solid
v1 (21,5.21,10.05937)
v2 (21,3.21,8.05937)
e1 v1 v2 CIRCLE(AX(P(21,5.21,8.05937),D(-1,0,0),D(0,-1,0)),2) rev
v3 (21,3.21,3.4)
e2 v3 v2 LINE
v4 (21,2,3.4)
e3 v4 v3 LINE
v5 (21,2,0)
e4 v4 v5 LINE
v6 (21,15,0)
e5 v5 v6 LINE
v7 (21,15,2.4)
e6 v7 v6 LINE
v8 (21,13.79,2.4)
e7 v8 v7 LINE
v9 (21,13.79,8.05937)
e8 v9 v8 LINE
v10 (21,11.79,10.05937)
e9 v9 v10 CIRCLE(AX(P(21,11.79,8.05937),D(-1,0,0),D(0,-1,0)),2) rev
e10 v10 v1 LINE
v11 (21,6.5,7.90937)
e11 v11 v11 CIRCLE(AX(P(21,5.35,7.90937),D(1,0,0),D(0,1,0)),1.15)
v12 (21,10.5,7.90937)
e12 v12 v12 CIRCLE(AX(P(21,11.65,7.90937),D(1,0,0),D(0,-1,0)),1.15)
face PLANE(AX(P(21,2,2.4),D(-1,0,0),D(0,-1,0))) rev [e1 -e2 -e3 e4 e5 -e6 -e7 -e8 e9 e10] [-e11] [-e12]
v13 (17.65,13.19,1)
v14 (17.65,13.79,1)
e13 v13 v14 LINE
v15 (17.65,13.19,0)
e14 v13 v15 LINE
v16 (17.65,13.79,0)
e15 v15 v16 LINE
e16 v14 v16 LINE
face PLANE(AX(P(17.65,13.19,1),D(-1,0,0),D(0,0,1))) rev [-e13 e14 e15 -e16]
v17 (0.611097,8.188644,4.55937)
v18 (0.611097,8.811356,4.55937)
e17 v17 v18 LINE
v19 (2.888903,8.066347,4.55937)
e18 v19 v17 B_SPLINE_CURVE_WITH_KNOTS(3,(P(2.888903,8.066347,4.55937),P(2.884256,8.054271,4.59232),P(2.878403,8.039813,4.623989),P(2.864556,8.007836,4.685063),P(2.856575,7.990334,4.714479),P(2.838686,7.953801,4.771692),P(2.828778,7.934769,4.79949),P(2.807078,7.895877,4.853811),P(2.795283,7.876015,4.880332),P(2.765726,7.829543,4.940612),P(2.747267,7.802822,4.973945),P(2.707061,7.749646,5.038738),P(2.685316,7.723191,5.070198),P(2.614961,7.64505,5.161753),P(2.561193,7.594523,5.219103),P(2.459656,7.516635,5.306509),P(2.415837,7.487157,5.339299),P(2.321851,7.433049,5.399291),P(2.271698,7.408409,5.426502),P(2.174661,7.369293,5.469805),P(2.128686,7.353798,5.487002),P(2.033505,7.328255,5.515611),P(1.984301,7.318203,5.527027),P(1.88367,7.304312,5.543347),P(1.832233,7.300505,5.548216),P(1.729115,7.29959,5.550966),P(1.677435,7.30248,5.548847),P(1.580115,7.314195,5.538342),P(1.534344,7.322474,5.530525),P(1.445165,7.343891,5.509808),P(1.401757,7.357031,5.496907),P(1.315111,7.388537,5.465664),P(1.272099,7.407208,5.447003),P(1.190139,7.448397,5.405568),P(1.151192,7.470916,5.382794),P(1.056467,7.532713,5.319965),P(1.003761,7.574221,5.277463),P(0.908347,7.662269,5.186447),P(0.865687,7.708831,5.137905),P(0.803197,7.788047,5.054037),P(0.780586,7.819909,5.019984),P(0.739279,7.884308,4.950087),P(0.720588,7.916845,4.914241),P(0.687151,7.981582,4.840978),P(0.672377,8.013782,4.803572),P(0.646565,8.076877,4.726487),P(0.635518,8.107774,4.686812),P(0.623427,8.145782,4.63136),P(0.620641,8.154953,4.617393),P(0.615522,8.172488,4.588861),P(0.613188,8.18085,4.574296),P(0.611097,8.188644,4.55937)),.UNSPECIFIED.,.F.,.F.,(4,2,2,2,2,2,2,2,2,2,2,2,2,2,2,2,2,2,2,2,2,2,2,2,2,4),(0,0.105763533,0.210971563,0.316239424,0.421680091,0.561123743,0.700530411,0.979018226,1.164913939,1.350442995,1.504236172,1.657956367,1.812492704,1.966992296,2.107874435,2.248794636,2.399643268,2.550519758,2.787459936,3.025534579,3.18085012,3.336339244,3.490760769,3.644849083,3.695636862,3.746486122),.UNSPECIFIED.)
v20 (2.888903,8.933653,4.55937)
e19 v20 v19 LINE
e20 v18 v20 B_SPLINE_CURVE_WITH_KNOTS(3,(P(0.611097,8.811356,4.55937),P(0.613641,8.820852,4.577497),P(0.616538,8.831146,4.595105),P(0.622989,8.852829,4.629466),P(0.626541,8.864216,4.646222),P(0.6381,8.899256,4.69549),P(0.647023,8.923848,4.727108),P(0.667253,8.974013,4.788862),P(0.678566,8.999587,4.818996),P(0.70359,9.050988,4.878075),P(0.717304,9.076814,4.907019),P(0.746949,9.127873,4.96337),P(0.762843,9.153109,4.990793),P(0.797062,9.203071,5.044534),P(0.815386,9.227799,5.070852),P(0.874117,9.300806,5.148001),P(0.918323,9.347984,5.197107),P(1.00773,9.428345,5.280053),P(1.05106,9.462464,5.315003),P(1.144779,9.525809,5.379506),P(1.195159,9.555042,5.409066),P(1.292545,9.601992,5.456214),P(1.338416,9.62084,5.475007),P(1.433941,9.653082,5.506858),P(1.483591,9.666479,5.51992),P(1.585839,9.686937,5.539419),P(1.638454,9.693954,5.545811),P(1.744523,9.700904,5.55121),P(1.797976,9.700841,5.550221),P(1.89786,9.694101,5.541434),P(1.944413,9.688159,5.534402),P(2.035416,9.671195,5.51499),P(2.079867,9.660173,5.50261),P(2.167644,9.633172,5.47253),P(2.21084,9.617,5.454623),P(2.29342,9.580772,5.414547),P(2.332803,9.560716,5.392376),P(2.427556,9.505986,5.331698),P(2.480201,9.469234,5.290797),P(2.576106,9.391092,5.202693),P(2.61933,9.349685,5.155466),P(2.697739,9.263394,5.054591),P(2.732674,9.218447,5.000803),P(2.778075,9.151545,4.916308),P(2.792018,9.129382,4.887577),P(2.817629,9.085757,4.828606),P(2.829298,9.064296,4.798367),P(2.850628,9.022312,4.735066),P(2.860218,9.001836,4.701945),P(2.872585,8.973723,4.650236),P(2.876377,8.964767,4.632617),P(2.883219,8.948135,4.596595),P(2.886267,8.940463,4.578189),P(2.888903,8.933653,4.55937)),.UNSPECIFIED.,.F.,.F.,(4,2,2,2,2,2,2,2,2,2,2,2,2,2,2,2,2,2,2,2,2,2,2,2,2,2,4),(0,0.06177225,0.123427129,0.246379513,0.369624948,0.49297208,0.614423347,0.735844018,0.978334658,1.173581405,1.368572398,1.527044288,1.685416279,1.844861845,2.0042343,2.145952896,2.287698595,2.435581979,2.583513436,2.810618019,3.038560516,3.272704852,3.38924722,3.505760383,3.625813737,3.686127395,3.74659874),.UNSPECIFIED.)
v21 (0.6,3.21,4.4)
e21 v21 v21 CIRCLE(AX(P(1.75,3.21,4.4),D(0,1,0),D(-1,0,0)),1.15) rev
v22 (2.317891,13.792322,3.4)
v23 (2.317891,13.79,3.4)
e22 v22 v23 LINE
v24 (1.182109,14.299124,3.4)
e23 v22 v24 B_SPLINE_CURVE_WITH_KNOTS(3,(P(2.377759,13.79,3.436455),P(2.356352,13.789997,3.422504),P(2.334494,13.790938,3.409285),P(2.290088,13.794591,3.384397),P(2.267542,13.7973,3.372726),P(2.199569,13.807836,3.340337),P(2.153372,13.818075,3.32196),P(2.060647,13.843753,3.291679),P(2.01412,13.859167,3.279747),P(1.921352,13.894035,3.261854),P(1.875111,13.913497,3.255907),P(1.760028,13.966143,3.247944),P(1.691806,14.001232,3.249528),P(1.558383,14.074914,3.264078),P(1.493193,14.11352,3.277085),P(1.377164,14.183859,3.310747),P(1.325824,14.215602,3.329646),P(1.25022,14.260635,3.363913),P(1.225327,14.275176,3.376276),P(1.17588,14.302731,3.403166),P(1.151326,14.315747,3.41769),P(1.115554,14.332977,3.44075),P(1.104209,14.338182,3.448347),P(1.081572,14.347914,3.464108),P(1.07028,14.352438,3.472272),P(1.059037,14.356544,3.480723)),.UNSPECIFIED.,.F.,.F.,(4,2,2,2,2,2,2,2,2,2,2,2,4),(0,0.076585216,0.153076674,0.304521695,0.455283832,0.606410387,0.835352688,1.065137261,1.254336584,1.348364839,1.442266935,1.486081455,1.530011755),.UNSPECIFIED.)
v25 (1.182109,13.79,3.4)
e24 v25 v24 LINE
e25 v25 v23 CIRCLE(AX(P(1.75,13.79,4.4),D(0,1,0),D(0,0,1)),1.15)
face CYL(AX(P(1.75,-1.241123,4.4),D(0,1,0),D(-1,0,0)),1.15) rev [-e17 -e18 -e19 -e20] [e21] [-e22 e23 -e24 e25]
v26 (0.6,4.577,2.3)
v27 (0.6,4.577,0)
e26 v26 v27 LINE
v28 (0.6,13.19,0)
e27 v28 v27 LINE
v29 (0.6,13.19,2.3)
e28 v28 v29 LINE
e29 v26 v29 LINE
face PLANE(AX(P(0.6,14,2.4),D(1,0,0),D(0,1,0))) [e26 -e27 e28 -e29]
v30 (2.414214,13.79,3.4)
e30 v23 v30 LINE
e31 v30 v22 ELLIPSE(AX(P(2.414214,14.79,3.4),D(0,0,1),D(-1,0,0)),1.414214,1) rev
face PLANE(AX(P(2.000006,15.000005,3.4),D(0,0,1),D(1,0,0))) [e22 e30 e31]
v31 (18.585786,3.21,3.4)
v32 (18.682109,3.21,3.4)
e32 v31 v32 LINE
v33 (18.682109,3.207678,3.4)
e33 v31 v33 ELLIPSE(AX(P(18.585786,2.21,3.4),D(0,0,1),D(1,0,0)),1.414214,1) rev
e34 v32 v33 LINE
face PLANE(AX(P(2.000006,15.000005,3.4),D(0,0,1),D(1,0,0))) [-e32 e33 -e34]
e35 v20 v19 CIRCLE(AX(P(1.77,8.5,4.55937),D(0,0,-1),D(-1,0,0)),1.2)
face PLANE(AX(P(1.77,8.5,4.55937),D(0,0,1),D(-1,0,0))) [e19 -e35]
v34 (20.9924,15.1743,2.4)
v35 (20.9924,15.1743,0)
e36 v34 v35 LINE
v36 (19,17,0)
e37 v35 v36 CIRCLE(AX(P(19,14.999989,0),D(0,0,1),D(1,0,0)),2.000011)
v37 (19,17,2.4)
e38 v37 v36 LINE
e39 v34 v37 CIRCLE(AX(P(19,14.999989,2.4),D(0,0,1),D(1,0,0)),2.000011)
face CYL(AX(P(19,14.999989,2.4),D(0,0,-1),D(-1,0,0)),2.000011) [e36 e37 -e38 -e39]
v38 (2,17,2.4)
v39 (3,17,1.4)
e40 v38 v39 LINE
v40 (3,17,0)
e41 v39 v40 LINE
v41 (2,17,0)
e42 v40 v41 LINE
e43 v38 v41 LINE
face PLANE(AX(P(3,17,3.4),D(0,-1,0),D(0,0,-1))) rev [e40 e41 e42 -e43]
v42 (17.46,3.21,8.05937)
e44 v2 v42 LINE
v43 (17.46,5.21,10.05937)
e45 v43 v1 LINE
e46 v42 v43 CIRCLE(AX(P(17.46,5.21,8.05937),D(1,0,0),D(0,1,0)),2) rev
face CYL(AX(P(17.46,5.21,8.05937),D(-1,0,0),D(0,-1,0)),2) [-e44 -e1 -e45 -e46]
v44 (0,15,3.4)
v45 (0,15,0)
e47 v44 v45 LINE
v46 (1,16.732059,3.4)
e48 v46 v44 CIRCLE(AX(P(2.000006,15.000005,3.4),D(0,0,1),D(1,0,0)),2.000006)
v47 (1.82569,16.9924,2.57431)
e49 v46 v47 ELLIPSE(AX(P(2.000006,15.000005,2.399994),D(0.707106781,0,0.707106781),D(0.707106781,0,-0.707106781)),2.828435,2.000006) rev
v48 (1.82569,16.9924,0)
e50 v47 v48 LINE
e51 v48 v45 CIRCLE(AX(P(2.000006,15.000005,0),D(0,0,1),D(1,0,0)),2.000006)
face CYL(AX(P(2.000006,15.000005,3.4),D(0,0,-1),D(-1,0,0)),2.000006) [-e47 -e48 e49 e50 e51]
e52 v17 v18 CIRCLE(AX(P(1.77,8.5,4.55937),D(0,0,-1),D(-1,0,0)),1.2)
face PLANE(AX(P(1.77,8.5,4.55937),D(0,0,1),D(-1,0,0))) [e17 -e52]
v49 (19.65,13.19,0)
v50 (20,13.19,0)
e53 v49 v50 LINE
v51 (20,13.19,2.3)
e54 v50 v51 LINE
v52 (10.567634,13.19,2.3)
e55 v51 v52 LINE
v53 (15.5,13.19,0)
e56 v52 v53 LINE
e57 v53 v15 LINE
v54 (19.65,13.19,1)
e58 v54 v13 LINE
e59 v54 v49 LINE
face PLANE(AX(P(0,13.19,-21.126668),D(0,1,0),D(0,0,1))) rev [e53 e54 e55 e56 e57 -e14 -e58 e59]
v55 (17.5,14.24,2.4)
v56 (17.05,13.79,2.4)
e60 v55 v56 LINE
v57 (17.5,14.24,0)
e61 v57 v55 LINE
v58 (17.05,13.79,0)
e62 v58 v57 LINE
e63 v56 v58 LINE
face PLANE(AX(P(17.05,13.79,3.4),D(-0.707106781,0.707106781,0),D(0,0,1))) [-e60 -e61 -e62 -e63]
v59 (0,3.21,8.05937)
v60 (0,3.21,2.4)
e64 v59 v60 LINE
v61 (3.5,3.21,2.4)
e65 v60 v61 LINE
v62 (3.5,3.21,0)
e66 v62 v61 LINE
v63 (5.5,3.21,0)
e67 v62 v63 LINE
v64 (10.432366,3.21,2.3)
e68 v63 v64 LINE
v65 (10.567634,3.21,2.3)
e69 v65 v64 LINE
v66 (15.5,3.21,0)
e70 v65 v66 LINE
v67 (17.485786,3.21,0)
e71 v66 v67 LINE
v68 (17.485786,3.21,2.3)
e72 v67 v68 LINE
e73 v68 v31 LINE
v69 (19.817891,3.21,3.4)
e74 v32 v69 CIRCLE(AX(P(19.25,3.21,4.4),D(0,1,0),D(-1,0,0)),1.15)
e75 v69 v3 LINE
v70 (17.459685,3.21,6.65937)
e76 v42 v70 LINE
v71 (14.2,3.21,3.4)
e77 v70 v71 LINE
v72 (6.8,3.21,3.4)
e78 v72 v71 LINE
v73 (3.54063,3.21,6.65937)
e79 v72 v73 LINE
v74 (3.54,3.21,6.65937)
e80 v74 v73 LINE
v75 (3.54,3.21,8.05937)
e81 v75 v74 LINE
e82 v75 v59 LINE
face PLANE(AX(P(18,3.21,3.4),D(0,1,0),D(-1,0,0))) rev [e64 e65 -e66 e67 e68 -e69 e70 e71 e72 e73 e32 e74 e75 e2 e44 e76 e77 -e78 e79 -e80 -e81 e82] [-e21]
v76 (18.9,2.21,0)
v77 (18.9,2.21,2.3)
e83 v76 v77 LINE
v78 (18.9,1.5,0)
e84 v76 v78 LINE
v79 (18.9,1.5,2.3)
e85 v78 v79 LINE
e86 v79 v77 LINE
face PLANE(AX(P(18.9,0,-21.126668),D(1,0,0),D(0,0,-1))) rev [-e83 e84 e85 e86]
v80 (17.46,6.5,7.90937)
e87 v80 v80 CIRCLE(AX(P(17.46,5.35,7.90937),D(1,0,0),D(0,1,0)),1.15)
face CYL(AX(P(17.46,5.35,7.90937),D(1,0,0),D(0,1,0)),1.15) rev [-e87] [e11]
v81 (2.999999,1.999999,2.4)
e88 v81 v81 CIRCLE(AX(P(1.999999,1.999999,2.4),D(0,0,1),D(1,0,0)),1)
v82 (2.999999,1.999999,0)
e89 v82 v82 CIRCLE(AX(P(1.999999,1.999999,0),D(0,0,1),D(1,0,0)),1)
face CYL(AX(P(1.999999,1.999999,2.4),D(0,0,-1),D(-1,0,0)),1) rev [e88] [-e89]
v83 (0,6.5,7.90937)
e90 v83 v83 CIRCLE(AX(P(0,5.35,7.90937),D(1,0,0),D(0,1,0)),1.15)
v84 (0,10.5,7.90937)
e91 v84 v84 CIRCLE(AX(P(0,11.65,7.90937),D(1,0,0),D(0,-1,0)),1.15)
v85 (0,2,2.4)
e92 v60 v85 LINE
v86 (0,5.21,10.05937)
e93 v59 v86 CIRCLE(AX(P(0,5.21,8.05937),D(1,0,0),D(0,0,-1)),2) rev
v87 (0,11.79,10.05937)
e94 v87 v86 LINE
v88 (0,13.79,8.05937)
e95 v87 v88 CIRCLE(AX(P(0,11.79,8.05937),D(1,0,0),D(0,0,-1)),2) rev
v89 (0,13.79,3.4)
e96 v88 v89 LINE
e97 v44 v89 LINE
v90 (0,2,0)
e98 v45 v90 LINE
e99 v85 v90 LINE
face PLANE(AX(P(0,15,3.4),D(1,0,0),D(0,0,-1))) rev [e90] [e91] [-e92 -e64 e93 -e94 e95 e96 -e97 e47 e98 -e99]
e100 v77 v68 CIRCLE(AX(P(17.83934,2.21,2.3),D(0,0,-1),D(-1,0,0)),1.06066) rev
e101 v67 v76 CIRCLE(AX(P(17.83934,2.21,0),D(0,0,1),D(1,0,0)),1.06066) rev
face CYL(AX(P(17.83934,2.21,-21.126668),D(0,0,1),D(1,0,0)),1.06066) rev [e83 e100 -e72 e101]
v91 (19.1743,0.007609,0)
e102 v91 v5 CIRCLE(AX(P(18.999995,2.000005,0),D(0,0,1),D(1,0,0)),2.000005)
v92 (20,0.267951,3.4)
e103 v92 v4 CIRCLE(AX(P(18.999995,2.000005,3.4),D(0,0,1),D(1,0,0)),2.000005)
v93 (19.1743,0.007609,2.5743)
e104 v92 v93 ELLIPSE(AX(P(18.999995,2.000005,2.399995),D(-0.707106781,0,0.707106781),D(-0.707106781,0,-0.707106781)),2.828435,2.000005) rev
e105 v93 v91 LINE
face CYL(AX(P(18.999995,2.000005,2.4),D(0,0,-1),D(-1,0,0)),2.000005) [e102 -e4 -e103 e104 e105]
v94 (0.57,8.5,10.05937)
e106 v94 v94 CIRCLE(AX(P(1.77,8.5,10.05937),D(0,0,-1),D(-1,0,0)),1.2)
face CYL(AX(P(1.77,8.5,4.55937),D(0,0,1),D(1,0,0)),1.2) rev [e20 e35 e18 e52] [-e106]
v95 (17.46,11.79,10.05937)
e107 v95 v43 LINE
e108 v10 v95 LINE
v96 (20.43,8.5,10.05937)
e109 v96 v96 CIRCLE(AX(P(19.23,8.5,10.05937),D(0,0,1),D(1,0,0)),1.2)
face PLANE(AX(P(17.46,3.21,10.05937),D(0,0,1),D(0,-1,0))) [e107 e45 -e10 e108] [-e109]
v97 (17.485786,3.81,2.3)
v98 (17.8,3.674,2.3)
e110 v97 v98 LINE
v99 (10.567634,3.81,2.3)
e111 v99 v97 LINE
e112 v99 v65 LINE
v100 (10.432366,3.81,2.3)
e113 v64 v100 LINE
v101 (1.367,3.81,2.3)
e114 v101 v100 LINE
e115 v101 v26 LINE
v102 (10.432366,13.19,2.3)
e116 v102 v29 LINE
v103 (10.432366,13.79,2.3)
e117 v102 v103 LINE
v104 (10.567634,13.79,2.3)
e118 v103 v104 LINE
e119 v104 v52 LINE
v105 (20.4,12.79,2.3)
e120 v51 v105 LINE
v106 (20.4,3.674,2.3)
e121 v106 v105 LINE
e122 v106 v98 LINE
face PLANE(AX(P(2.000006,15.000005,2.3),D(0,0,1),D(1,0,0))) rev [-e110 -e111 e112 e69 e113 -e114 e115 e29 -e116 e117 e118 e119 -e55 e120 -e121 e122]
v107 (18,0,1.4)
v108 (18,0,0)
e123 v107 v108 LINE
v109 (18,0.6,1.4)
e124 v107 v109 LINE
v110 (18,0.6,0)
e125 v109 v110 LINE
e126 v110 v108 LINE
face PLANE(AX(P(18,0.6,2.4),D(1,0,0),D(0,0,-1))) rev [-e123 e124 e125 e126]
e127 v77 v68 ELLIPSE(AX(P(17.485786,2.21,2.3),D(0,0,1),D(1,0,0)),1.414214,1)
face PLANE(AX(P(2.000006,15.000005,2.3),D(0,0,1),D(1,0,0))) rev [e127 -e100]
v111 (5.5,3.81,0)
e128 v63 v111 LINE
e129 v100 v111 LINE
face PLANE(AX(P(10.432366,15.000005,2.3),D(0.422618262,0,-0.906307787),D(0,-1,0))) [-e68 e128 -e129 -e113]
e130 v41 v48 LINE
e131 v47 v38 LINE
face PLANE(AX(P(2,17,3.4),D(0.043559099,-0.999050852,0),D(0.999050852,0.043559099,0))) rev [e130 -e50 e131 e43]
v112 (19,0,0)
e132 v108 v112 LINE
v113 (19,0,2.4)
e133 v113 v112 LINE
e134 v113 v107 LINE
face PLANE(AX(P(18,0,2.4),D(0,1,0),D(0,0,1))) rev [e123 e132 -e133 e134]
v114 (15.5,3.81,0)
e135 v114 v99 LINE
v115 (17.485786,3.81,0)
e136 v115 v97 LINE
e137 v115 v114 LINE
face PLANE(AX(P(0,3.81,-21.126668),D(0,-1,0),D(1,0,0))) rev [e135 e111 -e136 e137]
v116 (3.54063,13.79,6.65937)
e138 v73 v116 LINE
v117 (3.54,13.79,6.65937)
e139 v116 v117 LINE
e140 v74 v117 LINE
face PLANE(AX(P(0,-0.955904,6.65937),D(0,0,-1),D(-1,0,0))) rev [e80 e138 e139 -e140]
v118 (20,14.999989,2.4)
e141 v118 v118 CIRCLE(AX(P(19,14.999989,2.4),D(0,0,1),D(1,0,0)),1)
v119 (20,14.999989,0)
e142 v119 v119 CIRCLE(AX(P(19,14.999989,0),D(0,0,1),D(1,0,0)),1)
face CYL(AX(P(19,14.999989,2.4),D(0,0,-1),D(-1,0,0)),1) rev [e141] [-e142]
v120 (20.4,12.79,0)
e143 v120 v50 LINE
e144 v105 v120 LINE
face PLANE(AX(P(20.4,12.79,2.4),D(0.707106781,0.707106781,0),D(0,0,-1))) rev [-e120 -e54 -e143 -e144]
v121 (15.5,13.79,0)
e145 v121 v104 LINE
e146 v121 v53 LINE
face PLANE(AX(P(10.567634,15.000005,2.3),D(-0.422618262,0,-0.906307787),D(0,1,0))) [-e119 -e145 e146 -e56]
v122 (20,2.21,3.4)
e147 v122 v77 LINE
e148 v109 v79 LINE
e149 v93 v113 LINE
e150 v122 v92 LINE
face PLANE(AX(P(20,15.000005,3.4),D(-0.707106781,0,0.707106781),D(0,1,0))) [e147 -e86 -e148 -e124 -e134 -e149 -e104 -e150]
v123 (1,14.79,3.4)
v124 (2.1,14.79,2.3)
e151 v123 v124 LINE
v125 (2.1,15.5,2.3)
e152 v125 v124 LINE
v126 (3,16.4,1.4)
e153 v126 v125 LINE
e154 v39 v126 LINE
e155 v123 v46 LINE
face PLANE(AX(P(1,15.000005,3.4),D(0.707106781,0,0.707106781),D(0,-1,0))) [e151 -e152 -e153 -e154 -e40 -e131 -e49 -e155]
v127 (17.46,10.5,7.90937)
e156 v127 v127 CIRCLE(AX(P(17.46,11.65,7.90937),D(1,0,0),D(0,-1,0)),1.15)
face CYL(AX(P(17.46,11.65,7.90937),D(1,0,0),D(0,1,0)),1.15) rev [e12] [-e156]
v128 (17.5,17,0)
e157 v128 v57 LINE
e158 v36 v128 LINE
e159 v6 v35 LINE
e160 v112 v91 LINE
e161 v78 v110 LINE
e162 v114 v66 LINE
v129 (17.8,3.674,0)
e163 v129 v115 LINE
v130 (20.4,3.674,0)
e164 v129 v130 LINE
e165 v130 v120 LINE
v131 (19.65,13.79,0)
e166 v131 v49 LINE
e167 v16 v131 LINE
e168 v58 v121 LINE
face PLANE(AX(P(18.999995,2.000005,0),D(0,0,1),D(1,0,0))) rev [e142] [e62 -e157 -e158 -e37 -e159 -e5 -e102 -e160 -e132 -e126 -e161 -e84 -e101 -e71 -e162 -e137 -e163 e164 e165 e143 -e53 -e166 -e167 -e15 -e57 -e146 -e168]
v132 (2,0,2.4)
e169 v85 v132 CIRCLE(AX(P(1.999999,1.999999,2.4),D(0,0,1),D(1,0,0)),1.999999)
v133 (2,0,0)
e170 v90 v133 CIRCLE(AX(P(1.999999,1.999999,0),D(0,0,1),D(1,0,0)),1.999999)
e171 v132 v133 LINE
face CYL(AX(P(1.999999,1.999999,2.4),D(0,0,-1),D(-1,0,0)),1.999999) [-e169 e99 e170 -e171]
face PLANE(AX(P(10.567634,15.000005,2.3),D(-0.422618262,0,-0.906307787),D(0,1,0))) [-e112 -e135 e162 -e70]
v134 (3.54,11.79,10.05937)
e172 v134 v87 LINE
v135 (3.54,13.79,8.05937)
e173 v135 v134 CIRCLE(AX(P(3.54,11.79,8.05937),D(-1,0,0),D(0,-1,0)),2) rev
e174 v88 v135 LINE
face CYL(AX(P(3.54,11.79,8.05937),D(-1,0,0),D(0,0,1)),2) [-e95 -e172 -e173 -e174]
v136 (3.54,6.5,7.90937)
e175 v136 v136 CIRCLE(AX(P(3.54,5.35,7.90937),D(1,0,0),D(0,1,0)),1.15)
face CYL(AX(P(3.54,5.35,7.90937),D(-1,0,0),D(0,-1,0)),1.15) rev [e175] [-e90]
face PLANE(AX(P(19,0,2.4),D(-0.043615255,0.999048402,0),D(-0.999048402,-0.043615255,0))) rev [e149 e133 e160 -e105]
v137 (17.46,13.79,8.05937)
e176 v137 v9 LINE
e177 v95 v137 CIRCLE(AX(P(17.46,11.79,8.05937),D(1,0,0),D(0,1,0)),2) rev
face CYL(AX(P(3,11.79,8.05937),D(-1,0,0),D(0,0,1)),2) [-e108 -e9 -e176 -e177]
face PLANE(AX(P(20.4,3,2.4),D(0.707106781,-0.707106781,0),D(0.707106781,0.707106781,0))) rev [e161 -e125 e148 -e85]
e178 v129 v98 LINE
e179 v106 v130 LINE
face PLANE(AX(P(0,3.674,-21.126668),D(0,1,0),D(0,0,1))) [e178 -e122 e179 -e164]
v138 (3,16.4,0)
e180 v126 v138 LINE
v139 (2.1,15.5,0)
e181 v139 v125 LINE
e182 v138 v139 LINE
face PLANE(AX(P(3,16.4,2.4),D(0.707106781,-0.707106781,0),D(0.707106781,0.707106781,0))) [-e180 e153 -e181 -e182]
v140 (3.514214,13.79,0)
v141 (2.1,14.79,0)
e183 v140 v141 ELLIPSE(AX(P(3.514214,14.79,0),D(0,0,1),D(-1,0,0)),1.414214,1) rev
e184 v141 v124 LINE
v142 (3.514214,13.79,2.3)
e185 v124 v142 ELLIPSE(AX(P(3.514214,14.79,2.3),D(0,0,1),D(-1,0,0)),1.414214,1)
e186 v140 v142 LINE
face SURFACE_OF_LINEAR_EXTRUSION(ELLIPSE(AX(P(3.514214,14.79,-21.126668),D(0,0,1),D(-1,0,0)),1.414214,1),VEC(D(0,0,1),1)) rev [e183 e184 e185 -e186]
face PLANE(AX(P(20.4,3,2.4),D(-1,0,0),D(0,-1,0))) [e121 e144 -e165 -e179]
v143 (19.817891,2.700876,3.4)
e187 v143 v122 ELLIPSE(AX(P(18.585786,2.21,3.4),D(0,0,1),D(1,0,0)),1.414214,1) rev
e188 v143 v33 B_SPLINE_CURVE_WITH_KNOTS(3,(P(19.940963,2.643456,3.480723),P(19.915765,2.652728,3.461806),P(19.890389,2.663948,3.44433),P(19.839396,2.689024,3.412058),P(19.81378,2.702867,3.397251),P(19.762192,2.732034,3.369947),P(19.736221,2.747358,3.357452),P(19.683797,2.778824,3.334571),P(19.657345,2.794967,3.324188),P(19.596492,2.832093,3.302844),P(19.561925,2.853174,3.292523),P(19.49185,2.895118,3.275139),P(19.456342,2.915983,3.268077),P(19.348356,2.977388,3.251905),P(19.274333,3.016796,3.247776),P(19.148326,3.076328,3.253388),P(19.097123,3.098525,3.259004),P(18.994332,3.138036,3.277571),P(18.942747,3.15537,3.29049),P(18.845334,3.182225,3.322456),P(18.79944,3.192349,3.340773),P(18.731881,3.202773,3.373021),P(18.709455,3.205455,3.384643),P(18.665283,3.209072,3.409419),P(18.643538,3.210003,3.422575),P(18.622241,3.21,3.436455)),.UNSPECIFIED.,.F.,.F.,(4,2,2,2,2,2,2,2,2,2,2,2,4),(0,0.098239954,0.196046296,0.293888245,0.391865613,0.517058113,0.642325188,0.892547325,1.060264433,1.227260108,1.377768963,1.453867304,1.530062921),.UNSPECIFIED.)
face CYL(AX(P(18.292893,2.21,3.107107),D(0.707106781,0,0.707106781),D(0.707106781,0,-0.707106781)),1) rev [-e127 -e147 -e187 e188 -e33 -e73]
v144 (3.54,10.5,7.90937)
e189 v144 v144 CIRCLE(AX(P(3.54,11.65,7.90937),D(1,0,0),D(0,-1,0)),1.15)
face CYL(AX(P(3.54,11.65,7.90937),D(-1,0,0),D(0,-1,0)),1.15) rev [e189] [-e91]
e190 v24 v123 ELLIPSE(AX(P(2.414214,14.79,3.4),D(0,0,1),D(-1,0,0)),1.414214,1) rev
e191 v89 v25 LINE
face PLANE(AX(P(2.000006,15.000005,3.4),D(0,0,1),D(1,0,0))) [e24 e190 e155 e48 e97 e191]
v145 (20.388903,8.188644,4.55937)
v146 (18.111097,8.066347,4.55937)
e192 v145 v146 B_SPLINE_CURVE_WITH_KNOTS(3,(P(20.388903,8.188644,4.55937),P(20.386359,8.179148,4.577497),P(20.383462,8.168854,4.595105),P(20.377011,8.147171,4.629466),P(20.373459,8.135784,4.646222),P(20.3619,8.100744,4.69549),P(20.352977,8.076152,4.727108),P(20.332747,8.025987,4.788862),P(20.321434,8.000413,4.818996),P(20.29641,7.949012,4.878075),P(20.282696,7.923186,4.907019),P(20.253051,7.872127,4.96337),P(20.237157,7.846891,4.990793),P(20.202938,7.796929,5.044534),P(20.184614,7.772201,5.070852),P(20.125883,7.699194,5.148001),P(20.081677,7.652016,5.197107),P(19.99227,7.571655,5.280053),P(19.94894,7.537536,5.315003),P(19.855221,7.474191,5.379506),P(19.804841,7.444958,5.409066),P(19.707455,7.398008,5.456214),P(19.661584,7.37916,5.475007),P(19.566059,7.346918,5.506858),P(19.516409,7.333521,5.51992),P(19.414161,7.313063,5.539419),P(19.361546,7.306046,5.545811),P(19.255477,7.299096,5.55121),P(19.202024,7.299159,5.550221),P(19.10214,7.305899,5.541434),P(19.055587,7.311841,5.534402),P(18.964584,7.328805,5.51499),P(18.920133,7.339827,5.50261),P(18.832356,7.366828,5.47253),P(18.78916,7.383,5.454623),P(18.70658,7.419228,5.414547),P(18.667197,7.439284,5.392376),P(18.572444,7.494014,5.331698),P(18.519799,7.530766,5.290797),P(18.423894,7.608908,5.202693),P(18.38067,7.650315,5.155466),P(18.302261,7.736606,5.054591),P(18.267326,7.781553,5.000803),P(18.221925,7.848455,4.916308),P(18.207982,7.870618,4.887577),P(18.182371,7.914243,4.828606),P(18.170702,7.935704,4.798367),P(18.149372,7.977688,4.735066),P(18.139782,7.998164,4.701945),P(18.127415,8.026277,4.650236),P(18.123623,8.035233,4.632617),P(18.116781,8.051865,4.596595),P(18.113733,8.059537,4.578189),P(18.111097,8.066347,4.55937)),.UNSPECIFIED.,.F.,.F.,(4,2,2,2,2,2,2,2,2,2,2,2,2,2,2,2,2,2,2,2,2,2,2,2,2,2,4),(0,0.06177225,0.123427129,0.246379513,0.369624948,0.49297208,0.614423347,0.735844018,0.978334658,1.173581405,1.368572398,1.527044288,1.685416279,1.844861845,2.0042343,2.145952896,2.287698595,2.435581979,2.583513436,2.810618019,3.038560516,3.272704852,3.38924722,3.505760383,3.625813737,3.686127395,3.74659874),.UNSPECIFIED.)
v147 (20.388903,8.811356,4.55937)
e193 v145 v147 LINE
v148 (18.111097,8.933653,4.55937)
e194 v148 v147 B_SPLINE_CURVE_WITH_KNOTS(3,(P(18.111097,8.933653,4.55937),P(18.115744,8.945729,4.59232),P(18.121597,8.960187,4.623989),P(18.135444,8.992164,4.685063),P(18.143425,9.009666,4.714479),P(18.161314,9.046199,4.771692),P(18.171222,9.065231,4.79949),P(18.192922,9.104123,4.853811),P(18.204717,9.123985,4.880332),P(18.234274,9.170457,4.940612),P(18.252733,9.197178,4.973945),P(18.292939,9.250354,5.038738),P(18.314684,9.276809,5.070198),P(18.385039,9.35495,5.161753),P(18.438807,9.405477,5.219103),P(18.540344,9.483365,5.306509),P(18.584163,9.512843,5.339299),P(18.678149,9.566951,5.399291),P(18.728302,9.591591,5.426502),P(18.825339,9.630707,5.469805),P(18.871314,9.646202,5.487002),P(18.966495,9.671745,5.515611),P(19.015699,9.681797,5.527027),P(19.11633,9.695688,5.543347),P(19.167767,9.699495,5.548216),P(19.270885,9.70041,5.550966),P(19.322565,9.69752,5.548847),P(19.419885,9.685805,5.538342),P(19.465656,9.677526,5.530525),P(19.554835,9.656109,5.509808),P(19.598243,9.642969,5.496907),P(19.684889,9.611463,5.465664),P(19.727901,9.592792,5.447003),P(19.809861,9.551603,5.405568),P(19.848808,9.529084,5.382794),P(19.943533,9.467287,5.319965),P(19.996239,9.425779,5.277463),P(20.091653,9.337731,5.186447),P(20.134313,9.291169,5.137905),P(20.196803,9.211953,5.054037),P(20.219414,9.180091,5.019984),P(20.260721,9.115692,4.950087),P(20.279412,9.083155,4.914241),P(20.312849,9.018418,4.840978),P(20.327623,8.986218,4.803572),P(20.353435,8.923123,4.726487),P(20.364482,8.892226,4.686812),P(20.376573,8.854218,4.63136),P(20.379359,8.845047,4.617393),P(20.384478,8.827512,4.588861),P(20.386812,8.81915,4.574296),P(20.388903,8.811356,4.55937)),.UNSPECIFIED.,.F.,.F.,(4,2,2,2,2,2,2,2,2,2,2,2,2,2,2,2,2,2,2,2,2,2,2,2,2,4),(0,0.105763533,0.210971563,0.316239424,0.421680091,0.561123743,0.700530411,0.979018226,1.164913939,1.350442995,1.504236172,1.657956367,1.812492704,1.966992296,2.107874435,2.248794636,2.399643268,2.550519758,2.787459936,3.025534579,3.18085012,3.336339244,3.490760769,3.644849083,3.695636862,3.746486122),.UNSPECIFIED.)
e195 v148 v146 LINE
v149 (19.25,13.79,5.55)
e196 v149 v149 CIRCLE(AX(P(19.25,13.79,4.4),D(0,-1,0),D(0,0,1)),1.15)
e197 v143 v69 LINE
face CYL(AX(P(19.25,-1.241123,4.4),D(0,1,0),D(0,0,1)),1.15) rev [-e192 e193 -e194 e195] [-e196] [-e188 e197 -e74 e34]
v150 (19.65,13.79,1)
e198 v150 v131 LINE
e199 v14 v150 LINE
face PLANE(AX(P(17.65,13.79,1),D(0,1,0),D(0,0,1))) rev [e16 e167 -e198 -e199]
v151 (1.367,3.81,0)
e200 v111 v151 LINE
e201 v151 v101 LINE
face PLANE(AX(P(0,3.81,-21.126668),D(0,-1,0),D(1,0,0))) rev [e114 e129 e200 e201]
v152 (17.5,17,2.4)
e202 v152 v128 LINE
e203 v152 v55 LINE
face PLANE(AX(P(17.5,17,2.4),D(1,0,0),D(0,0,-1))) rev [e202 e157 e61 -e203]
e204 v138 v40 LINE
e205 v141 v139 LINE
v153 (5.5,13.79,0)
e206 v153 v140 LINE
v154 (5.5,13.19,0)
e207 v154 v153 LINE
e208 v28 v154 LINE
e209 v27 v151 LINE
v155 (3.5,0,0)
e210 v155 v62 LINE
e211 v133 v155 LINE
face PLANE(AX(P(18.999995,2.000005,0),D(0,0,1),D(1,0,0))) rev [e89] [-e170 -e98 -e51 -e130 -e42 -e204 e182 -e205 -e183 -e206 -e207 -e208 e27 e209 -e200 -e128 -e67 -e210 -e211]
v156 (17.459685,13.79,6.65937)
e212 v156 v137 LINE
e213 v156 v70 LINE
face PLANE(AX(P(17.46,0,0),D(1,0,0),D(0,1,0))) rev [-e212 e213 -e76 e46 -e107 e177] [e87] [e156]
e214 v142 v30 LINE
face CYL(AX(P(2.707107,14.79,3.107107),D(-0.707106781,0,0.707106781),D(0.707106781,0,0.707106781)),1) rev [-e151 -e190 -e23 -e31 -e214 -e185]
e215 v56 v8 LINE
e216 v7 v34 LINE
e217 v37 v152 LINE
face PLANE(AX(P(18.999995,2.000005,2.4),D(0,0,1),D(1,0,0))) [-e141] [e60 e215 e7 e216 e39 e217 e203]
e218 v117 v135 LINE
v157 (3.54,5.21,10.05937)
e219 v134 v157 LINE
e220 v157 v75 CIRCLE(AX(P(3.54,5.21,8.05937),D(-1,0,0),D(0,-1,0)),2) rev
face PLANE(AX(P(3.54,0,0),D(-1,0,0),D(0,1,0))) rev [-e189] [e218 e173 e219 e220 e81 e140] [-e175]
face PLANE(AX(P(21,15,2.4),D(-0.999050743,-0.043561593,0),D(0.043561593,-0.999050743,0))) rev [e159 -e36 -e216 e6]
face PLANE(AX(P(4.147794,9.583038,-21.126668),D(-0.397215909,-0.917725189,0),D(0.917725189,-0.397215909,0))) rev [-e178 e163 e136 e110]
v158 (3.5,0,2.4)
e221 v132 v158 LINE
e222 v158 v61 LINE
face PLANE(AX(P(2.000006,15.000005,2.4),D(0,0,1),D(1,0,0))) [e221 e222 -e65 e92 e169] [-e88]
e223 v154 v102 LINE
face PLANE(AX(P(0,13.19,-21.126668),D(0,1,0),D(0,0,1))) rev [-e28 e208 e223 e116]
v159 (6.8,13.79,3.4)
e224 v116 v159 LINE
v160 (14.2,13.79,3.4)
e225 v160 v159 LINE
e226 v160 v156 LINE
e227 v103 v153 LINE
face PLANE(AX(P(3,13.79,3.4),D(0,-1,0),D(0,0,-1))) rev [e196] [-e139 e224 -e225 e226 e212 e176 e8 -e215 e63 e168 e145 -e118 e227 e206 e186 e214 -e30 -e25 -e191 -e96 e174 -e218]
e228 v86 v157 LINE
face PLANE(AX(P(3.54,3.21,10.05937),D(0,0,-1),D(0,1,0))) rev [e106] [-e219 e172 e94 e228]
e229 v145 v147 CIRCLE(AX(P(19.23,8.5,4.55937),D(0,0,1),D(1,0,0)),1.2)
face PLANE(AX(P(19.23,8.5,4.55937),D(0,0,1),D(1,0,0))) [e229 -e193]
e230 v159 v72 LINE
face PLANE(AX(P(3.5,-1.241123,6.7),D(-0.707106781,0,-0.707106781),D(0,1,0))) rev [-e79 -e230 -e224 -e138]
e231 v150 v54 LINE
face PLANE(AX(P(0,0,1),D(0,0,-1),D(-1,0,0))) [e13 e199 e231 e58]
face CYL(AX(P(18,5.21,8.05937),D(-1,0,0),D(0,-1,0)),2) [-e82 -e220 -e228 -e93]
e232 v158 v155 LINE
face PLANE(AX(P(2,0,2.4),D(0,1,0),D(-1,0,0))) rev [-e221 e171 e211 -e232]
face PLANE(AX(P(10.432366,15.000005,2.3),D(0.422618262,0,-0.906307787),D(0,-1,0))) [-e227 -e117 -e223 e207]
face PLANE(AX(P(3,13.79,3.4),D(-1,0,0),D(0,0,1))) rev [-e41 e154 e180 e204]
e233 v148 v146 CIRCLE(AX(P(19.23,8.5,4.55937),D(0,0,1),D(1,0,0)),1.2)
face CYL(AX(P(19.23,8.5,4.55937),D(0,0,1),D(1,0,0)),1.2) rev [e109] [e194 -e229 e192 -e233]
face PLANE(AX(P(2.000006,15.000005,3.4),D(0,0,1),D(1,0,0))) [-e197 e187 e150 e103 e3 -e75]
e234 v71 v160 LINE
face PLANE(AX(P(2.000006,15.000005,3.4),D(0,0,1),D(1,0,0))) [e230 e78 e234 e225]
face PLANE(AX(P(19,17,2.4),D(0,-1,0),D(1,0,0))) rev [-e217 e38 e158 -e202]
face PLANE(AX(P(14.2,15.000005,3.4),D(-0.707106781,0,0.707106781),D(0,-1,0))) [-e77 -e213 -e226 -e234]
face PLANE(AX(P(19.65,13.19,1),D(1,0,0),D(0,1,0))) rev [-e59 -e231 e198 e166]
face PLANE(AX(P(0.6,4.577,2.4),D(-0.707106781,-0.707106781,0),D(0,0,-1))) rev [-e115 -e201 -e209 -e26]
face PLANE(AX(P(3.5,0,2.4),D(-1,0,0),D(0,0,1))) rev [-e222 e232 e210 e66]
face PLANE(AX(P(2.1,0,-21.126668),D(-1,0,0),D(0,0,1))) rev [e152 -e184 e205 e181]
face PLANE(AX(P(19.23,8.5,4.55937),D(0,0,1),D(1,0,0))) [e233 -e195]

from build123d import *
from build123d.topology import SkipClean

# Parameters (mm, degrees)
SKETCH1_R                = 1
BOSS_EXTRUDE2_DEPTH      = 2.4
BOSS_EXTRUDE2_2_DEPTH    = 2.4
BOSS_EXTRUDE5_DEPTH      = 1
BOSS_EXTRUDE5_DEPTH_BACK = 0.1
CHAMFER1_SIZE            = 2
FILLET1_R                = 1
BOSS_EXTRUDE6_DEPTH      = 10.58
SKETCH9_R                = 1.15
CUT_EXTRUDE5_DEPTH       = 26.864775274
BOSS_EXTRUDE10_DEPTH     = 10.58
CHAMFER4_SIZE            = 3.3
SKETCH12_W               = 3.4
SKETCH12_H               = 10.58
SKETCH12_R               = 1.15
BOSS_EXTRUDE11_DEPTH     = 3.54
FILLET2_R                = 2
SKETCH13_R               = 1.2
CUT_EXTRUDE7_DEPTH       = 5.5
CHAMFER4_OF_MIRROR1_SIZE = 3.3
FILLET2_OF_MIRROR1_R     = 2
CHAMFER3_SIZE            = 1
SKETCH6_W                = 17.485786438
SKETCH6_H                = 0.6
BOSS_EXTRUDE8_DEPTH      = 2.3
SKETCH7_W                = 2
SKETCH7_H                = 0.6
CUT_EXTRUDE4_DEPTH       = 1
SKETCH11_W               = 10
SKETCH11_H               = 0.6
CUT_EXTRUDE6_DEPTH       = 2.3
CHAMFER5_SIZE            = 4.932365917
CHAMFER5_SIZE_2          = 2.3
CHAMFER6_SIZE            = 0.45


with BuildPart() as part:
    # Sketch1 → Boss-Extrude2 (new body)
    with BuildSketch(Plane.XY):
        with BuildLine():
            Line((0.6, 14), (0.6, 3.577))
            Line((0.6, 3.577), (3.5, 3.577))
            Line((3.5, 3.577), (3.5, 0))
            Line((3.5, 0), (2, 0))
            ThreePointArc((2, 0), (0.585786, 0.585786), (0, 2))
            Line((0, 2), (0, 15))
            ThreePointArc((0, 15), (0.52544374, 16.351186251), (1.82569, 16.9924))
            Line((1.82569, 16.9924), (2, 17))
            Line((2, 17), (3, 17))
            Line((3, 17), (3, 16.4))
            Line((3, 16.4), (0.6, 14))
        make_face()
        with Locations((1.999998506, 1.999998506)):
            Circle(SKETCH1_R, mode=Mode.SUBTRACT)
    extrude(amount=BOSS_EXTRUDE2_DEPTH)



with BuildPart() as body_2:
    # Sketch1 → Boss-Extrude2 2 (new body)
    with BuildSketch(Plane.XY):
        with BuildLine():
            Line((20.4, 3), (20.4, 13.79))
            Line((20.4, 13.79), (17.5, 13.79))
            Line((17.5, 13.79), (17.5, 17))
            Line((17.5, 17), (19, 17))
            ThreePointArc((19, 17), (20.351188195, 16.47455126), (20.9924, 15.1743))
            Line((20.9924, 15.1743), (21, 15))
            Line((21, 15), (21, 2))
            ThreePointArc((21, 2), (20.474549436, 0.648816495), (19.1743, 0.00760938))
            Line((19.1743, 0.00760938), (19, 0))
            Line((19, 0), (18, 0))
            Line((18, 0), (18, 0.6))
            Line((18, 0.6), (20.4, 3))
        make_face()
        with Locations((18.999999966, 14.999989488)):
            Circle(SKETCH1_R, mode=Mode.SUBTRACT)
    extrude(amount=BOSS_EXTRUDE2_2_DEPTH)


with BuildPart() as part_1:
    add(part.part)

    add(body_2.part)  # Boss-Extrude5 merges body 2
    # Sketch2 → Boss-Extrude5 (add, two sides: drawn at the far end of the back side and taken through both)
    with BuildSketch(Plane.XY.offset(2.4).offset(-BOSS_EXTRUDE5_DEPTH_BACK)):
        with BuildLine():
            Line((3, 13.79), (21, 13.79))
            Line((21, 13.79), (21, 2))
            ThreePointArc((21, 2), (20.474549436, 0.648816495), (19.1743, 0.00760938))
            Line((19.1743, 0.00760938), (19, 0))
            Line((19, 0), (18, 0))
            Line((18, 0), (18, 3.21))
            Line((18, 3.21), (0, 3.21))
            Line((0, 3.21), (0, 15))
            ThreePointArc((0, 15), (0.52544374, 16.351186251), (1.82569, 16.9924))
            Line((1.82569, 16.9924), (2, 17))
            Line((2, 17), (3, 17))
            Line((3, 17), (3, 13.79))
        make_face()
    extrude(amount=BOSS_EXTRUDE5_DEPTH + BOSS_EXTRUDE5_DEPTH_BACK)

    # Chamfer1
    # the kernel refuses this chamfer: 2 mm, written as the material it takes off along each edge
    with BuildSketch(Plane(origin=(18, -5.143365976, 3.4), x_dir=(-0.027495876610585623, 0, -0.9996219169112968), z_dir=(0, 1, 0)), Plane(origin=(3, 22.143365976, 3.4), x_dir=(0.02749587661058627, 0, -0.9996219169112968), z_dir=(0, -1, 0))) as chamfer1_piece_1:
        Polygon((CHAMFER1_SIZE * 0.999621916911, -CHAMFER1_SIZE * 0.0274958766106), (-CHAMFER1_SIZE * 0.0274958766106, -CHAMFER1_SIZE * 0.999621916911), (0, 0), align=None)
    extrude(amount=8.353365976, mode=Mode.SUBTRACT)

    # Fillet1
    fillet1_edges = [part_1.edges().sort_by_distance(p)[0] for p in [
        (19.45, 3.21, 2.85),
        (1.55, 13.79, 2.85),
    ]]
    fillet(fillet1_edges, radius=FILLET1_R)

    # Sketch3 → Boss-Extrude6 (add)
    with BuildSketch(Plane(origin=(0, 13.79, 0), x_dir=(1, 0, 0), z_dir=(0, 1, 0))):
        with BuildLine():
            Line((21, -4.4), (21, -3.4))
            Line((21, -3.4), (19.817890835, -3.4))
            ThreePointArc((19.817890835, -3.4), (19.25, -5.55), (18.682109165, -3.4))
            Line((18.682109165, -3.4), (17.5, -3.4))
            Line((17.5, -3.4), (17.5, -4.4))
            ThreePointArc((17.5, -4.4), (19.25, -6.15), (21, -4.4))
        make_face()
    boss_extrude6 = extrude(amount=-BOSS_EXTRUDE6_DEPTH)

    # Sketch9 → Cut-Extrude5 (cut, symmetric)
    with BuildSketch(Plane(origin=(0, 13.79, 0), x_dir=(1, 0, 0), z_dir=(0, 1, 0))):
        with Locations(Location((19.25, -4.4, 0), (0, 0, 270))):
            Circle(SKETCH9_R)
    cut_extrude5 = extrude(amount=CUT_EXTRUDE5_DEPTH, both=True, mode=Mode.SUBTRACT)

    # Sketch10 → Boss-Extrude10 (add)
    with SkipClean():  # the faces are left unmerged after this step: merging them gives an invalid solid
        with BuildSketch(Plane(origin=(0, 13.79, 0), x_dir=(1, 0, 0), z_dir=(0, 1, 0))):
            with BuildLine():
                Line((17.5, -6.659370346), (17.5, -4.4))
                Line((17.5, -4.4), (18.1, -4.4))
                ThreePointArc((18.1, -4.4), (19.25, -5.55), (20.4, -4.4))
                Line((20.4, -4.4), (21, -4.4))
                Line((21, -4.4), (21, -6.659370346))
                Line((21, -6.659370346), (17.5, -6.659370346))
            make_face()
        boss_extrude10 = extrude(amount=-BOSS_EXTRUDE10_DEPTH)

    # Chamfer4
    # the kernel refuses this chamfer: 3.3 mm, written as the material it adds along each edge
    with BuildSketch(Plane(origin=(17.5, 13.79, 3.4), x_dir=(-0.9996219169112966, 0, -0.027495876610586684), z_dir=(0, -1, 0))) as chamfer4_piece_1_section:
        Polygon((CHAMFER4_SIZE * 0.999621916911, -CHAMFER4_SIZE * 0.0274958766106), (-CHAMFER4_SIZE * 0.0274958766106, -CHAMFER4_SIZE * 0.999621916911), (0, 0), align=None)
    chamfer4_piece_1 = extrude(amount=10.58, mode=Mode.PRIVATE)
    chamfer4_piece_1 = split(chamfer4_piece_1, bisect_by=Plane(origin=(16.408327536, 8.5, 6.659370346), z_dir=(0, 0, -1)), keep=Keep.TOP, mode=Mode.PRIVATE)
    add(chamfer4_piece_1)

    # Sketch12 → Boss-Extrude11 (add)
    with SkipClean():  # the faces are left unmerged after this step: merging them gives an invalid solid
        with BuildSketch(Plane(origin=(21, 0, 0), x_dir=(0, 0, -1), z_dir=(1, 0, 0))):
            with Locations((-8.359370346, 8.5)):
                Rectangle(SKETCH12_W, SKETCH12_H)
            with Locations(Location((-7.909370346, 5.35, 0), (0, 0, 90))):
                Circle(SKETCH12_R, mode=Mode.SUBTRACT)
            with Locations(Location((-7.909370346, 11.65, 0), (0, 0, 270))):
                Circle(SKETCH12_R, mode=Mode.SUBTRACT)
        boss_extrude11 = extrude(amount=-BOSS_EXTRUDE11_DEPTH)

    # Fillet2
    fillet2_edges = [part_1.edges().sort_by_distance(p)[0] for p in [
        (19.23, 3.21, 10.059370346),
        (19.23, 13.79, 10.059370346),
    ]]
    fillet(fillet2_edges, radius=FILLET2_R)

    # Sketch13 → Cut-Extrude7 (cut)
    with BuildSketch(Plane.XY.offset(10.059370346)):
        with Locations((19.23, 8.5)):
            Circle(SKETCH13_R)
    cut_extrude7 = extrude(amount=-CUT_EXTRUDE7_DEPTH, mode=Mode.SUBTRACT)

    # Mirror1: Boss-Extrude6, Cut-Extrude5, Boss-Extrude10, Boss-Extrude11, Cut-Extrude7 across plane
    with SkipClean():  # the faces are left unmerged after this step: merging them gives an invalid solid
        add(boss_extrude6.mirror(Plane.ZY.offset(-10.5)))
        add(cut_extrude5.mirror(Plane.ZY.offset(-10.5)), mode=Mode.SUBTRACT)
        add(boss_extrude10.mirror(Plane.ZY.offset(-10.5)))
        add(boss_extrude11.mirror(Plane.ZY.offset(-10.5)))
        add(cut_extrude7.mirror(Plane.ZY.offset(-10.5)), mode=Mode.SUBTRACT)

    # Chamfer4 of Mirror1
    # the kernel refuses this chamfer: 3.3 mm, written as the material it adds along each edge
    with BuildSketch(Plane(origin=(3.5, 13.79, 3.4), x_dir=(0.9996219169112966, 1.0675155552485545e-15, -0.027495876610586698), z_dir=(0, -1, 0))) as chamfer4_of_mirror1_piece_1:
        Polygon((CHAMFER4_OF_MIRROR1_SIZE * 0.999621916911, CHAMFER4_OF_MIRROR1_SIZE * 0.0274958766106), (-CHAMFER4_OF_MIRROR1_SIZE * 0.0274958766106, CHAMFER4_OF_MIRROR1_SIZE * 0.999621916911), (0, 0), align=None)
    extrude(amount=10.58)

    # Fillet2 of Mirror1
    fillet2_of_mirror1_edges = [part_1.edges().sort_by_distance(p)[0] for p in [
        (1.77, 3.21, 10.059370346),
        (1.77, 13.79, 10.059370346),
    ]]
    fillet(fillet2_of_mirror1_edges, radius=FILLET2_OF_MIRROR1_R)

    # Chamfer3
    chamfer3_edges = [part_1.edges().sort_by_distance(p)[0] for p in [
        (0.6, 3.577, 1.15),
        (20.4, 13.79, 1.15),
    ]]
    chamfer(chamfer3_edges, length=CHAMFER3_SIZE)

    # Sketch6 → Boss-Extrude8 (add)
    with SkipClean():  # the faces are left unmerged after this step: merging them gives an invalid solid
        with BuildSketch(Plane(origin=(0, 0, 2.3), x_dir=(-1, 0, 0), z_dir=(0, 0, -1))):
            with Locations((-8.742893219, 3.51)):
                Rectangle(SKETCH6_W, SKETCH6_H)
            with BuildLine():
                ThreePointArc((-18.9, 2.21), (-18.451712264, 3.076025404), (-17.485786438, 3.21))
                Line((-17.485786438, 3.21), (-17.485786438, 3.81))
                Line((-17.485786438, 3.81), (-17.8, 3.674))
                Line((-17.8, 3.674), (-21, 3.674))
                Line((-21, 3.674), (-20.4, 3))
                Line((-20.4, 3), (-20.4, 1.5))
                Line((-20.4, 1.5), (-18.9, 1.5))
                Line((-18.9, 1.5), (-18.9, 2.21))
            make_face()
            with BuildLine():
                Line((-3.514213562, 13.79), (-17.5, 13.79))
                Line((-17.5, 13.79), (-17.5, 13.89))
                Line((-17.5, 13.89), (-21, 13.89))
                Line((-21, 13.89), (-21, 13.19))
                Line((-21, 13.19), (-0.5, 13.19))
                Line((-0.5, 13.19), (-0.5, 15.5))
                Line((-0.5, 15.5), (-2.1, 15.5))
                Line((-2.1, 15.5), (-2.1, 14.79))
                add(Edge.make_bspline(
                    [(-3.514213562, 13.79), (-2.1, 13.79), (-2.1, 14.79)],
                    knots=[4.71238898, 4.71238898, 4.71238898, 6.283185307, 6.283185307, 6.283185307], degree=2, weights=[1, 0.707106781, 1]))
            make_face()
        extrude(amount=BOSS_EXTRUDE8_DEPTH)

    # Sketch7 → Cut-Extrude4 (cut)
    with SkipClean():  # the faces are left unmerged after this step: merging them gives an invalid solid
        with BuildSketch(Plane(origin=(0, 0, 0), x_dir=(-1, 0, 0), z_dir=(0, 0, -1))):
            with Locations((-18.65, 13.49)):
                Rectangle(SKETCH7_W, SKETCH7_H)
        extrude(amount=-CUT_EXTRUDE4_DEPTH, mode=Mode.SUBTRACT)

    # Sketch11 → Cut-Extrude6 (cut)
    with SkipClean():  # the faces are left unmerged after this step: merging them gives an invalid solid
        with BuildSketch(Plane(origin=(0, 0, 0), x_dir=(-1, 0, 0), z_dir=(0, 0, -1))):
            with Locations((-10.5, 3.51)):
                Rectangle(SKETCH11_W, SKETCH11_H)
            with Locations((-10.5, 13.49)):
                Rectangle(SKETCH11_W, SKETCH11_H)
        extrude(amount=-CUT_EXTRUDE6_DEPTH, mode=Mode.SUBTRACT)

    # Chamfer5
    # the kernel refuses this chamfer: 4.932365917, 2.3 mm, written as the material it adds along each edge
    with BuildSketch(Plane(origin=(15.5, 3.21, 2.3), x_dir=(-0.9998669641130704, 0, 0.016311164131110237), z_dir=(0, 1, 0))) as chamfer5_piece_1_section:
        Polygon((CHAMFER5_SIZE * 0.999866964148, -CHAMFER5_SIZE * 0.0163111641317), (-CHAMFER5_SIZE_2 * 0.0163111641311, -CHAMFER5_SIZE_2 * 0.999866964113), (0, 0), align=None)
    chamfer5_piece_1 = extrude(amount=0.6, mode=Mode.PRIVATE)
    chamfer5_piece_1 = split(chamfer5_piece_1, bisect_by=Plane(origin=(13.827499222, 3.51, 0), z_dir=(0, 0, 1)), keep=Keep.TOP, mode=Mode.PRIVATE)
    add(chamfer5_piece_1)
    with BuildSketch(Plane(origin=(15.5, 3.21, 2.3), x_dir=(-0.9998669641130704, 0, 0.016311164131110237), z_dir=(0, 1, 0))) as chamfer5_piece_2_section:
        Polygon((CHAMFER5_SIZE * 0.999866964148, -CHAMFER5_SIZE * 0.0163111641317), (-CHAMFER5_SIZE_2 * 0.0163111641311, -CHAMFER5_SIZE_2 * 0.999866964113), (0, 0), align=None)
    chamfer5_piece_2 = extrude(amount=13.379639107, mode=Mode.PRIVATE)
    chamfer5_piece_2 = split(chamfer5_piece_2, bisect_by=Plane(origin=(13.827499222, 13.79, 1.578386063), z_dir=(0, -1, 0)), keep=Keep.TOP, mode=Mode.PRIVATE)
    chamfer5_piece_2 = split(chamfer5_piece_2, bisect_by=Plane(origin=(13.827499222, 13.19, 1.578386063), z_dir=(0, 1, 0)), keep=Keep.TOP, mode=Mode.PRIVATE)
    chamfer5_piece_2 = split(chamfer5_piece_2, bisect_by=Plane(origin=(13.827499222, 13.49, 0), z_dir=(0, 0, 1)), keep=Keep.TOP, mode=Mode.PRIVATE)
    add(chamfer5_piece_2)
    with BuildSketch(Plane(origin=(5.5, 16.589639107, 2.3), x_dir=(0.9998669641130704, 0, 0.01631116413111024), z_dir=(0, -1, 0))) as chamfer5_piece_3_section:
        Polygon((CHAMFER5_SIZE * 0.999866964148, -CHAMFER5_SIZE * 0.0163111641317), (-CHAMFER5_SIZE_2 * 0.0163111641311, -CHAMFER5_SIZE_2 * 0.999866964113), (0, 0), align=None)
    chamfer5_piece_3 = extrude(amount=13.379639107, mode=Mode.PRIVATE)
    chamfer5_piece_3 = split(chamfer5_piece_3, bisect_by=Plane(origin=(7.172500778, 13.49, 0), z_dir=(0, 0, 1)), keep=Keep.TOP, mode=Mode.PRIVATE)
    chamfer5_piece_3 = split(chamfer5_piece_3, bisect_by=Plane(origin=(7.172500778, 13.19, 1.578386063), z_dir=(0, 1, 0)), keep=Keep.TOP, mode=Mode.PRIVATE)
    chamfer5_piece_3 = split(chamfer5_piece_3, bisect_by=Plane(origin=(7.172500778, 13.79, 1.578386063), z_dir=(0, -1, 0)), keep=Keep.TOP, mode=Mode.PRIVATE)
    add(chamfer5_piece_3)
    with BuildSketch(Plane(origin=(5.5, 3.81, 2.3), x_dir=(0.9998669641130704, 0, 0.01631116413111024), z_dir=(0, -1, 0))) as chamfer5_piece_4_section:
        Polygon((CHAMFER5_SIZE * 0.999866964148, -CHAMFER5_SIZE * 0.0163111641317), (-CHAMFER5_SIZE_2 * 0.0163111641311, -CHAMFER5_SIZE_2 * 0.999866964113), (0, 0), align=None)
    chamfer5_piece_4 = extrude(amount=0.6, mode=Mode.PRIVATE)
    chamfer5_piece_4 = split(chamfer5_piece_4, bisect_by=Plane(origin=(7.172500778, 3.51, 0), z_dir=(0, 0, 1)), keep=Keep.TOP, mode=Mode.PRIVATE)
    add(chamfer5_piece_4)
    with BuildSketch(Plane(origin=(15.5, 0.410360893, 2.3), x_dir=(-0.9998669641130704, 0, 0.016311164131110237), z_dir=(0, 1, 0))) as chamfer5_piece_5_section:
        Polygon((CHAMFER5_SIZE * 0.999866964148, -CHAMFER5_SIZE * 0.0163111641317), (-CHAMFER5_SIZE_2 * 0.0163111641311, -CHAMFER5_SIZE_2 * 0.999866964113), (0, 0), align=None)
    chamfer5_piece_5 = extrude(amount=13.379639107, mode=Mode.PRIVATE)
    chamfer5_piece_5 = split(chamfer5_piece_5, bisect_by=Plane(origin=(13.827499222, 3.21, 1.578386063), z_dir=(0, 1, 0)), keep=Keep.TOP, mode=Mode.PRIVATE)
    chamfer5_piece_5 = split(chamfer5_piece_5, bisect_by=Plane(origin=(13.827499222, 3.81, 1.578386063), z_dir=(0, -1, 0)), keep=Keep.TOP, mode=Mode.PRIVATE)
    chamfer5_piece_5 = split(chamfer5_piece_5, bisect_by=Plane(origin=(13.827499222, 3.51, 0), z_dir=(0, 0, 1)), keep=Keep.TOP, mode=Mode.PRIVATE)
    add(chamfer5_piece_5)
    with BuildSketch(Plane(origin=(15.5, 13.19, 2.3), x_dir=(-0.9998669641130704, 0, 0.016311164131110237), z_dir=(0, 1, 0))) as chamfer5_piece_6_section:
        Polygon((CHAMFER5_SIZE * 0.999866964148, -CHAMFER5_SIZE * 0.0163111641317), (-CHAMFER5_SIZE_2 * 0.0163111641311, -CHAMFER5_SIZE_2 * 0.999866964113), (0, 0), align=None)
    chamfer5_piece_6 = extrude(amount=0.6, mode=Mode.PRIVATE)
    chamfer5_piece_6 = split(chamfer5_piece_6, bisect_by=Plane(origin=(13.827499222, 13.49, 0), z_dir=(0, 0, 1)), keep=Keep.TOP, mode=Mode.PRIVATE)
    add(chamfer5_piece_6)
    with BuildSketch(Plane(origin=(5.5, 13.79, 2.3), x_dir=(-0.07481330637060017, 0, -0.9971975577536775), z_dir=(0, -1, 0))) as chamfer5_piece_7_section:
        Polygon((CHAMFER5_SIZE_2 * 0.997197557754, CHAMFER5_SIZE_2 * 0.0748133063706), (-CHAMFER5_SIZE * 0.0748133063732, CHAMFER5_SIZE * 0.997197557788), (0, 0), align=None)
    chamfer5_piece_7 = extrude(amount=0.6, mode=Mode.PRIVATE)
    chamfer5_piece_7 = split(chamfer5_piece_7, bisect_by=Plane(origin=(7.172500778, 13.49, 0), z_dir=(0, 0, 1)), keep=Keep.TOP, mode=Mode.PRIVATE)
    add(chamfer5_piece_7)
    with BuildSketch(Plane(origin=(5.5, 13.79, 2.3), x_dir=(-0.07481330637060017, 0, -0.9971975577536775), z_dir=(0, -1, 0))) as chamfer5_piece_8_section:
        Polygon((CHAMFER5_SIZE_2 * 0.997197557754, CHAMFER5_SIZE_2 * 0.0748133063706), (-CHAMFER5_SIZE * 0.0748133063732, CHAMFER5_SIZE * 0.997197557788), (0, 0), align=None)
    chamfer5_piece_8 = extrude(amount=13.379639107, mode=Mode.PRIVATE)
    chamfer5_piece_8 = split(chamfer5_piece_8, bisect_by=Plane(origin=(7.172500778, 3.51, 0), z_dir=(0, 0, 1)), keep=Keep.TOP, mode=Mode.PRIVATE)
    chamfer5_piece_8 = split(chamfer5_piece_8, bisect_by=Plane(origin=(7.172500778, 3.21, 1.578386063), z_dir=(0, 1, 0)), keep=Keep.TOP, mode=Mode.PRIVATE)
    chamfer5_piece_8 = split(chamfer5_piece_8, bisect_by=Plane(origin=(7.172500778, 3.81, 1.578386063), z_dir=(0, -1, 0)), keep=Keep.TOP, mode=Mode.PRIVATE)
    add(chamfer5_piece_8)

    # Chamfer6
    # the kernel refuses this chamfer: 0.45 mm, written as the material it adds along each edge
    with BuildSketch(Plane(origin=(17.5, 13.79, 0), x_dir=(-0.9996219169112969, -0.027495876610584467, 0), z_dir=(0, 0, 1))) as chamfer6_piece_1:
        Polygon((CHAMFER6_SIZE * 0.999621916911, -CHAMFER6_SIZE * 0.0274958766106), (-CHAMFER6_SIZE * 0.0274958766106, -CHAMFER6_SIZE * 0.999621916911), (0, 0), align=None)
    extrude(amount=2.3)
    with BuildSketch(Plane(origin=(17.5, 13.79, 2.3), x_dir=(-0.9996219169112965, -0.027495876610592135, 0), z_dir=(0, 0, 1))) as chamfer6_piece_2:
        Polygon((CHAMFER6_SIZE * 0.999621916911, -CHAMFER6_SIZE * 0.0274958766106), (-CHAMFER6_SIZE * 0.0274958766106, -CHAMFER6_SIZE * 0.999621916911), (0, 0), align=None)
    extrude(amount=0.1)


solid = part_1.part
